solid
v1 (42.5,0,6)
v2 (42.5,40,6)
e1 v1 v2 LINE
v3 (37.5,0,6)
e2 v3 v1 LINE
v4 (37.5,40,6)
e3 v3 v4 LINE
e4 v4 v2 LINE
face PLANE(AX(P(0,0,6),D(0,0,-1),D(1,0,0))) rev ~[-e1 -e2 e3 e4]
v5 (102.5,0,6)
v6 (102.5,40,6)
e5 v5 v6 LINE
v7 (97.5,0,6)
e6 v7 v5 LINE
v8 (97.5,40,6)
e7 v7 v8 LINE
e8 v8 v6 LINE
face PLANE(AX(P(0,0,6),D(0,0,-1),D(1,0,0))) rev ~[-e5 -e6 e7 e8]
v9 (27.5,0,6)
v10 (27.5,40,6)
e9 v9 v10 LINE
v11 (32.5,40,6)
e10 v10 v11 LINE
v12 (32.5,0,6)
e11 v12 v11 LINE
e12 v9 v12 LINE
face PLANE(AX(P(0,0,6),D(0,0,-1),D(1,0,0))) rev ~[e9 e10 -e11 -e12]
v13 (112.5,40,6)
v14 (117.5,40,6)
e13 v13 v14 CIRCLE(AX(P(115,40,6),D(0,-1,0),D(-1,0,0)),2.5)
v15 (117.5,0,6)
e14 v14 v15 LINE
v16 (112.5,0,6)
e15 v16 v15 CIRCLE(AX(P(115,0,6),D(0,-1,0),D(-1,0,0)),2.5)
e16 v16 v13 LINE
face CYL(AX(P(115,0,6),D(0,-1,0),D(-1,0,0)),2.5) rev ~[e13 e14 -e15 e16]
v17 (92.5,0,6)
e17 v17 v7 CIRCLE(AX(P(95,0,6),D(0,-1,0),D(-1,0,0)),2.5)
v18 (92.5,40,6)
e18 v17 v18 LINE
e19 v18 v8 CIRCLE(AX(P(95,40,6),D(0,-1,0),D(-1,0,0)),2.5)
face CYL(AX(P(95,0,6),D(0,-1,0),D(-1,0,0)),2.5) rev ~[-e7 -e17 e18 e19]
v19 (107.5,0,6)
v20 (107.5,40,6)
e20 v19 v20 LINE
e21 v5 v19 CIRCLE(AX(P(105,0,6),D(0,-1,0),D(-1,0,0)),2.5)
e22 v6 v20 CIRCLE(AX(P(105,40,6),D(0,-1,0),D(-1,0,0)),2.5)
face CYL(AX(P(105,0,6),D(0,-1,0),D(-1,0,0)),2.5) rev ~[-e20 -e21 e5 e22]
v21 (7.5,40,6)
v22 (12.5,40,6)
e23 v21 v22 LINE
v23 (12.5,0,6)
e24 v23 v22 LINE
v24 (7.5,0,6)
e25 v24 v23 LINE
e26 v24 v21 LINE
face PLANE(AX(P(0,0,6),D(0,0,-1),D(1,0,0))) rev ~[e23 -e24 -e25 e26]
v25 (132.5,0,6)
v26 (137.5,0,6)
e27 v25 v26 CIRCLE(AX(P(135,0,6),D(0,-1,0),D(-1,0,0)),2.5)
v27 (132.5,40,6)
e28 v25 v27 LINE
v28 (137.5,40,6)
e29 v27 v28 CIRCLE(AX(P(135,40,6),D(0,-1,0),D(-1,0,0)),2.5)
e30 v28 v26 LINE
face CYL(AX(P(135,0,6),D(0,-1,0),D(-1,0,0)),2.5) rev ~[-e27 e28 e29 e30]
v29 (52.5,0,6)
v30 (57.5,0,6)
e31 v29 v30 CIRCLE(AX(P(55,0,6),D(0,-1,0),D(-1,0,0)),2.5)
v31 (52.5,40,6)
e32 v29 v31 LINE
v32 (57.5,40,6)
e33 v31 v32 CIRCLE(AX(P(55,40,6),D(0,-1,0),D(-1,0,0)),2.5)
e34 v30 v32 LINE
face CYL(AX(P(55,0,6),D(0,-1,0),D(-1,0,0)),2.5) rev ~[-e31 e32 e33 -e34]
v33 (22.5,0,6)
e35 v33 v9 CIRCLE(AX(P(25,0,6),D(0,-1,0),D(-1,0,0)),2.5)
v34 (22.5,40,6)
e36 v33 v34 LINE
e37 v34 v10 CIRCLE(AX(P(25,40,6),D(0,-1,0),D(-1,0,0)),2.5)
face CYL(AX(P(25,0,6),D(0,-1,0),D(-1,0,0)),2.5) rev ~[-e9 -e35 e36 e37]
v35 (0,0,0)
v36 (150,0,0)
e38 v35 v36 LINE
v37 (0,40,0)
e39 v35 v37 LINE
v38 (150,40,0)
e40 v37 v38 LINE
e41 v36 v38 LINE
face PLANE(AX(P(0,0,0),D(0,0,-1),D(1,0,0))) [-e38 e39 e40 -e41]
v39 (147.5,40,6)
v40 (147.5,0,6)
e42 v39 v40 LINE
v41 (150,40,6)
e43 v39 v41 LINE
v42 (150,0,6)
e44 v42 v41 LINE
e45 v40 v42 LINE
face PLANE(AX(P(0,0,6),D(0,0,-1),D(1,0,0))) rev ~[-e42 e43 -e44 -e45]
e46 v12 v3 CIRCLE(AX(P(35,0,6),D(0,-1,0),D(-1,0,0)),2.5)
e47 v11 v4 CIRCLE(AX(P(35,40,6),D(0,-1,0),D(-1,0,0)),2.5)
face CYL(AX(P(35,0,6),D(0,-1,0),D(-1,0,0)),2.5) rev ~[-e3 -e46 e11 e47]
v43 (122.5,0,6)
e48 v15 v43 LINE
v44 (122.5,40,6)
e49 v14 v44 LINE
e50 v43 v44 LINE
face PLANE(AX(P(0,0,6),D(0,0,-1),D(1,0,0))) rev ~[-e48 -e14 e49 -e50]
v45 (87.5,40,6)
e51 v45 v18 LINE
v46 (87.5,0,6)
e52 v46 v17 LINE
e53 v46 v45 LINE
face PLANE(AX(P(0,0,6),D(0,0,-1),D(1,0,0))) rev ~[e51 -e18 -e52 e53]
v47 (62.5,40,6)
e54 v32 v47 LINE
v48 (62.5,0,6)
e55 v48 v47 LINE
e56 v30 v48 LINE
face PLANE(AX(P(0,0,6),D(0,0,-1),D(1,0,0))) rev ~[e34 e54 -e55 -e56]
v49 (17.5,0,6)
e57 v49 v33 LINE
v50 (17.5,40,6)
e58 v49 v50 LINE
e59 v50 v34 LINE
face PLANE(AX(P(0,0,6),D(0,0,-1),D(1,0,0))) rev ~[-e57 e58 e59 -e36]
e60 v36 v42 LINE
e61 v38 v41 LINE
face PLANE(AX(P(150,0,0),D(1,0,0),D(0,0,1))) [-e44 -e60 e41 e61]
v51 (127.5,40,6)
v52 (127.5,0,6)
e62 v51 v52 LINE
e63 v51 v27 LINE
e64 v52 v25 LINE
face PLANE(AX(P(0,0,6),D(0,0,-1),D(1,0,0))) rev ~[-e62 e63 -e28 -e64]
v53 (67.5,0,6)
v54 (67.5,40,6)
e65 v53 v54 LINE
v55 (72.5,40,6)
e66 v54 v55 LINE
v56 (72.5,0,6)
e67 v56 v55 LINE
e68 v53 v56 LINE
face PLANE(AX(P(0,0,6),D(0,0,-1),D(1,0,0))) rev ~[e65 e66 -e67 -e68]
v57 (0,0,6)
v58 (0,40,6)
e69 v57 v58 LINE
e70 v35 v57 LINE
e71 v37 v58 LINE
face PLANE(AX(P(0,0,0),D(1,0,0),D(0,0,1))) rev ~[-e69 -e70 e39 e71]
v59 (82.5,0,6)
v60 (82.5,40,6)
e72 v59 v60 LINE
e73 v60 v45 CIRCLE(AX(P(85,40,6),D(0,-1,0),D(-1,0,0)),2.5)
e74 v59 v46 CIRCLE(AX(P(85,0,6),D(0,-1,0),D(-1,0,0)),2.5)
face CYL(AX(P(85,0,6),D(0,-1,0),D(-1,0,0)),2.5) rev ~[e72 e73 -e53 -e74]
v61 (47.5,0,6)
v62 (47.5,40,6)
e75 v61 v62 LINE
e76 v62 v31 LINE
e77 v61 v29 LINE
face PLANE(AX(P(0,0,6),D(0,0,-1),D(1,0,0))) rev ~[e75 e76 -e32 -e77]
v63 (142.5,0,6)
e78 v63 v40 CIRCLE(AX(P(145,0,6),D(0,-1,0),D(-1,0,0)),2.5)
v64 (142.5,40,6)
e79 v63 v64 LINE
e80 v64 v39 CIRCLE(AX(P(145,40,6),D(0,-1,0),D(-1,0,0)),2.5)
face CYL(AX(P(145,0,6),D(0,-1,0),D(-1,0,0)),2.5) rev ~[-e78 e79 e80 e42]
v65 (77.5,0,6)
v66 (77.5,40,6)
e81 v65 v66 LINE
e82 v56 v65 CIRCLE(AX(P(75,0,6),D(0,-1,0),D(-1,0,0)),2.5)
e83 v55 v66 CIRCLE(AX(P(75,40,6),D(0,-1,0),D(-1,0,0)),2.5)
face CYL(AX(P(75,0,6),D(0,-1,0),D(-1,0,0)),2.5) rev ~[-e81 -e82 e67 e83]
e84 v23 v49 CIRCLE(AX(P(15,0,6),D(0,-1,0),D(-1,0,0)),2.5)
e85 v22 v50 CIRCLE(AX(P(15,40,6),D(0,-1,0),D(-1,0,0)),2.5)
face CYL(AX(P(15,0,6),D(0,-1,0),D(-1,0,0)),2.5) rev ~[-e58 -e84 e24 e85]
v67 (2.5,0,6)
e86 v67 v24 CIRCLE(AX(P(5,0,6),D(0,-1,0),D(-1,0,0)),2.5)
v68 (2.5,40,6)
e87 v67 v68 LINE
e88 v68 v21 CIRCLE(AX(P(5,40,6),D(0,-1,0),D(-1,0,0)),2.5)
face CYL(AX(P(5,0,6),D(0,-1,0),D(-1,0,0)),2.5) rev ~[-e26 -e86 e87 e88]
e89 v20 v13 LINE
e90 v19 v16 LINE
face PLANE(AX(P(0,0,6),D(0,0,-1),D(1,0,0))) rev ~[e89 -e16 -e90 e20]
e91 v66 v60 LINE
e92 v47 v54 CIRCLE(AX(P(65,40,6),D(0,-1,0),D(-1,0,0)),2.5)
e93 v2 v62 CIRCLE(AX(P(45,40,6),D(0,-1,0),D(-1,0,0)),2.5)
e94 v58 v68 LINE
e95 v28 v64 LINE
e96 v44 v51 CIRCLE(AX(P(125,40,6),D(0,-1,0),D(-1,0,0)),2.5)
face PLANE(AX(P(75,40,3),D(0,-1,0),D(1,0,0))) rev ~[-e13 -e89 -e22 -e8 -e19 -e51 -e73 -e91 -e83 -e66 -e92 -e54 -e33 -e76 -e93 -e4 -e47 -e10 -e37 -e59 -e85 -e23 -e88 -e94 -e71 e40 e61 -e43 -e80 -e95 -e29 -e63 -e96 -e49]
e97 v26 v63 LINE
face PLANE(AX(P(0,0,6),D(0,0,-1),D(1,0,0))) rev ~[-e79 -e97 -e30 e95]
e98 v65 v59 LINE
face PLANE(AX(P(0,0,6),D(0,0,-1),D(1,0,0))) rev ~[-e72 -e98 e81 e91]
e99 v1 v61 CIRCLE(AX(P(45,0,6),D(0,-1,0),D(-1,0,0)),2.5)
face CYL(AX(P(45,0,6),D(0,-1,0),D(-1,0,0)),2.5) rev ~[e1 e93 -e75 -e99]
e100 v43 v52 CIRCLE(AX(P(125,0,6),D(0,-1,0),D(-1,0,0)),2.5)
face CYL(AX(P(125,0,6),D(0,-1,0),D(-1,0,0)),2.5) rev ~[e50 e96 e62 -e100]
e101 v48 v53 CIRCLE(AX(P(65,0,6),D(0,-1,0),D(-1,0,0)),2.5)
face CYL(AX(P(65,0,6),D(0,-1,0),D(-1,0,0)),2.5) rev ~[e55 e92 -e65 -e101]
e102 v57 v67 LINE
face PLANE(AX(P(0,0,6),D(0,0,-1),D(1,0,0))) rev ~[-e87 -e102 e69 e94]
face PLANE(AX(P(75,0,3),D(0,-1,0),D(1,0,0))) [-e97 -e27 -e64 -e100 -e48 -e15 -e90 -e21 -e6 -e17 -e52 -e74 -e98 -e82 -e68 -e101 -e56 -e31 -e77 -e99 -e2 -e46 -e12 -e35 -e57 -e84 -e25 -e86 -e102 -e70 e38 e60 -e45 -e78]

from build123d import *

# Parameters (mm, degrees)
F0_W     = 150
F0_H     = 6
F1_DEPTH = 40
F3_DEPTH = 40.001


with BuildPart() as f1:
    # F0 (on Front) → F1 (new body)
    with BuildSketch(Plane.XZ):
        with Locations((75, 3)):
            Rectangle(F0_W, F0_H)
    extrude(amount=-F1_DEPTH)

    # F2 (on face) → F3 (cut, through all)
    with BuildSketch(Plane.XZ):
        with BuildLine():
            ThreePointArc((2.5, 6), (5, 3.5), (7.5, 6))
            Line((7.5, 6), (2.5, 6))
        make_face()
        with BuildLine():
            Line((17.5, 6), (12.5, 6))
            ThreePointArc((12.5, 6), (15, 3.5), (17.5, 6))
        make_face()
        with BuildLine():
            Line((27.5, 6), (22.5, 6))
            ThreePointArc((22.5, 6), (25, 3.5), (27.5, 6))
        make_face()
        with BuildLine():
            Line((37.5, 6), (32.5, 6))
            ThreePointArc((32.5, 6), (35, 3.5), (37.5, 6))
        make_face()
        with BuildLine():
            Line((142.5, 6), (147.5, 6))
            ThreePointArc((147.5, 6), (145, 8.5), (142.5, 6))
        make_face()
        with BuildLine():
            ThreePointArc((142.5, 6), (145, 3.5), (147.5, 6))
            Line((147.5, 6), (142.5, 6))
        make_face()
        with BuildLine():
            Line((47.5, 6), (42.5, 6))
            ThreePointArc((42.5, 6), (45, 3.5), (47.5, 6))
        make_face()
        with BuildLine():
            Line((132.5, 6), (137.5, 6))
            ThreePointArc((137.5, 6), (135, 8.5), (132.5, 6))
        make_face()
        with BuildLine():
            ThreePointArc((132.5, 6), (135, 3.5), (137.5, 6))
            Line((137.5, 6), (132.5, 6))
        make_face()
        with BuildLine():
            Line((57.5, 6), (52.5, 6))
            ThreePointArc((52.5, 6), (55, 3.5), (57.5, 6))
        make_face()
        with BuildLine():
            Line((122.5, 6), (127.5, 6))
            ThreePointArc((127.5, 6), (125, 8.5), (122.5, 6))
        make_face()
        with BuildLine():
            ThreePointArc((122.5, 6), (125, 3.5), (127.5, 6))
            Line((127.5, 6), (122.5, 6))
        make_face()
        with BuildLine():
            Line((67.5, 6), (62.5, 6))
            ThreePointArc((62.5, 6), (65, 3.5), (67.5, 6))
        make_face()
        with BuildLine():
            Line((112.5, 6), (117.5, 6))
            ThreePointArc((117.5, 6), (115, 8.5), (112.5, 6))
        make_face()
        with BuildLine():
            ThreePointArc((112.5, 6), (115, 3.5), (117.5, 6))
            Line((117.5, 6), (112.5, 6))
        make_face()
        with BuildLine():
            Line((77.5, 6), (72.5, 6))
            ThreePointArc((72.5, 6), (75, 3.5), (77.5, 6))
        make_face()
        with BuildLine():
            ThreePointArc((102.5, 6), (105, 3.5), (107.5, 6))
            Line((107.5, 6), (102.5, 6))
        make_face()
        with BuildLine():
            Line((87.5, 6), (82.5, 6))
            ThreePointArc((82.5, 6), (85, 3.5), (87.5, 6))
        make_face()
        with BuildLine():
            ThreePointArc((92.5, 6), (95, 3.5), (97.5, 6))
            Line((97.5, 6), (92.5, 6))
        make_face()
    extrude(amount=-F3_DEPTH, mode=Mode.SUBTRACT)


solid = f1.part
